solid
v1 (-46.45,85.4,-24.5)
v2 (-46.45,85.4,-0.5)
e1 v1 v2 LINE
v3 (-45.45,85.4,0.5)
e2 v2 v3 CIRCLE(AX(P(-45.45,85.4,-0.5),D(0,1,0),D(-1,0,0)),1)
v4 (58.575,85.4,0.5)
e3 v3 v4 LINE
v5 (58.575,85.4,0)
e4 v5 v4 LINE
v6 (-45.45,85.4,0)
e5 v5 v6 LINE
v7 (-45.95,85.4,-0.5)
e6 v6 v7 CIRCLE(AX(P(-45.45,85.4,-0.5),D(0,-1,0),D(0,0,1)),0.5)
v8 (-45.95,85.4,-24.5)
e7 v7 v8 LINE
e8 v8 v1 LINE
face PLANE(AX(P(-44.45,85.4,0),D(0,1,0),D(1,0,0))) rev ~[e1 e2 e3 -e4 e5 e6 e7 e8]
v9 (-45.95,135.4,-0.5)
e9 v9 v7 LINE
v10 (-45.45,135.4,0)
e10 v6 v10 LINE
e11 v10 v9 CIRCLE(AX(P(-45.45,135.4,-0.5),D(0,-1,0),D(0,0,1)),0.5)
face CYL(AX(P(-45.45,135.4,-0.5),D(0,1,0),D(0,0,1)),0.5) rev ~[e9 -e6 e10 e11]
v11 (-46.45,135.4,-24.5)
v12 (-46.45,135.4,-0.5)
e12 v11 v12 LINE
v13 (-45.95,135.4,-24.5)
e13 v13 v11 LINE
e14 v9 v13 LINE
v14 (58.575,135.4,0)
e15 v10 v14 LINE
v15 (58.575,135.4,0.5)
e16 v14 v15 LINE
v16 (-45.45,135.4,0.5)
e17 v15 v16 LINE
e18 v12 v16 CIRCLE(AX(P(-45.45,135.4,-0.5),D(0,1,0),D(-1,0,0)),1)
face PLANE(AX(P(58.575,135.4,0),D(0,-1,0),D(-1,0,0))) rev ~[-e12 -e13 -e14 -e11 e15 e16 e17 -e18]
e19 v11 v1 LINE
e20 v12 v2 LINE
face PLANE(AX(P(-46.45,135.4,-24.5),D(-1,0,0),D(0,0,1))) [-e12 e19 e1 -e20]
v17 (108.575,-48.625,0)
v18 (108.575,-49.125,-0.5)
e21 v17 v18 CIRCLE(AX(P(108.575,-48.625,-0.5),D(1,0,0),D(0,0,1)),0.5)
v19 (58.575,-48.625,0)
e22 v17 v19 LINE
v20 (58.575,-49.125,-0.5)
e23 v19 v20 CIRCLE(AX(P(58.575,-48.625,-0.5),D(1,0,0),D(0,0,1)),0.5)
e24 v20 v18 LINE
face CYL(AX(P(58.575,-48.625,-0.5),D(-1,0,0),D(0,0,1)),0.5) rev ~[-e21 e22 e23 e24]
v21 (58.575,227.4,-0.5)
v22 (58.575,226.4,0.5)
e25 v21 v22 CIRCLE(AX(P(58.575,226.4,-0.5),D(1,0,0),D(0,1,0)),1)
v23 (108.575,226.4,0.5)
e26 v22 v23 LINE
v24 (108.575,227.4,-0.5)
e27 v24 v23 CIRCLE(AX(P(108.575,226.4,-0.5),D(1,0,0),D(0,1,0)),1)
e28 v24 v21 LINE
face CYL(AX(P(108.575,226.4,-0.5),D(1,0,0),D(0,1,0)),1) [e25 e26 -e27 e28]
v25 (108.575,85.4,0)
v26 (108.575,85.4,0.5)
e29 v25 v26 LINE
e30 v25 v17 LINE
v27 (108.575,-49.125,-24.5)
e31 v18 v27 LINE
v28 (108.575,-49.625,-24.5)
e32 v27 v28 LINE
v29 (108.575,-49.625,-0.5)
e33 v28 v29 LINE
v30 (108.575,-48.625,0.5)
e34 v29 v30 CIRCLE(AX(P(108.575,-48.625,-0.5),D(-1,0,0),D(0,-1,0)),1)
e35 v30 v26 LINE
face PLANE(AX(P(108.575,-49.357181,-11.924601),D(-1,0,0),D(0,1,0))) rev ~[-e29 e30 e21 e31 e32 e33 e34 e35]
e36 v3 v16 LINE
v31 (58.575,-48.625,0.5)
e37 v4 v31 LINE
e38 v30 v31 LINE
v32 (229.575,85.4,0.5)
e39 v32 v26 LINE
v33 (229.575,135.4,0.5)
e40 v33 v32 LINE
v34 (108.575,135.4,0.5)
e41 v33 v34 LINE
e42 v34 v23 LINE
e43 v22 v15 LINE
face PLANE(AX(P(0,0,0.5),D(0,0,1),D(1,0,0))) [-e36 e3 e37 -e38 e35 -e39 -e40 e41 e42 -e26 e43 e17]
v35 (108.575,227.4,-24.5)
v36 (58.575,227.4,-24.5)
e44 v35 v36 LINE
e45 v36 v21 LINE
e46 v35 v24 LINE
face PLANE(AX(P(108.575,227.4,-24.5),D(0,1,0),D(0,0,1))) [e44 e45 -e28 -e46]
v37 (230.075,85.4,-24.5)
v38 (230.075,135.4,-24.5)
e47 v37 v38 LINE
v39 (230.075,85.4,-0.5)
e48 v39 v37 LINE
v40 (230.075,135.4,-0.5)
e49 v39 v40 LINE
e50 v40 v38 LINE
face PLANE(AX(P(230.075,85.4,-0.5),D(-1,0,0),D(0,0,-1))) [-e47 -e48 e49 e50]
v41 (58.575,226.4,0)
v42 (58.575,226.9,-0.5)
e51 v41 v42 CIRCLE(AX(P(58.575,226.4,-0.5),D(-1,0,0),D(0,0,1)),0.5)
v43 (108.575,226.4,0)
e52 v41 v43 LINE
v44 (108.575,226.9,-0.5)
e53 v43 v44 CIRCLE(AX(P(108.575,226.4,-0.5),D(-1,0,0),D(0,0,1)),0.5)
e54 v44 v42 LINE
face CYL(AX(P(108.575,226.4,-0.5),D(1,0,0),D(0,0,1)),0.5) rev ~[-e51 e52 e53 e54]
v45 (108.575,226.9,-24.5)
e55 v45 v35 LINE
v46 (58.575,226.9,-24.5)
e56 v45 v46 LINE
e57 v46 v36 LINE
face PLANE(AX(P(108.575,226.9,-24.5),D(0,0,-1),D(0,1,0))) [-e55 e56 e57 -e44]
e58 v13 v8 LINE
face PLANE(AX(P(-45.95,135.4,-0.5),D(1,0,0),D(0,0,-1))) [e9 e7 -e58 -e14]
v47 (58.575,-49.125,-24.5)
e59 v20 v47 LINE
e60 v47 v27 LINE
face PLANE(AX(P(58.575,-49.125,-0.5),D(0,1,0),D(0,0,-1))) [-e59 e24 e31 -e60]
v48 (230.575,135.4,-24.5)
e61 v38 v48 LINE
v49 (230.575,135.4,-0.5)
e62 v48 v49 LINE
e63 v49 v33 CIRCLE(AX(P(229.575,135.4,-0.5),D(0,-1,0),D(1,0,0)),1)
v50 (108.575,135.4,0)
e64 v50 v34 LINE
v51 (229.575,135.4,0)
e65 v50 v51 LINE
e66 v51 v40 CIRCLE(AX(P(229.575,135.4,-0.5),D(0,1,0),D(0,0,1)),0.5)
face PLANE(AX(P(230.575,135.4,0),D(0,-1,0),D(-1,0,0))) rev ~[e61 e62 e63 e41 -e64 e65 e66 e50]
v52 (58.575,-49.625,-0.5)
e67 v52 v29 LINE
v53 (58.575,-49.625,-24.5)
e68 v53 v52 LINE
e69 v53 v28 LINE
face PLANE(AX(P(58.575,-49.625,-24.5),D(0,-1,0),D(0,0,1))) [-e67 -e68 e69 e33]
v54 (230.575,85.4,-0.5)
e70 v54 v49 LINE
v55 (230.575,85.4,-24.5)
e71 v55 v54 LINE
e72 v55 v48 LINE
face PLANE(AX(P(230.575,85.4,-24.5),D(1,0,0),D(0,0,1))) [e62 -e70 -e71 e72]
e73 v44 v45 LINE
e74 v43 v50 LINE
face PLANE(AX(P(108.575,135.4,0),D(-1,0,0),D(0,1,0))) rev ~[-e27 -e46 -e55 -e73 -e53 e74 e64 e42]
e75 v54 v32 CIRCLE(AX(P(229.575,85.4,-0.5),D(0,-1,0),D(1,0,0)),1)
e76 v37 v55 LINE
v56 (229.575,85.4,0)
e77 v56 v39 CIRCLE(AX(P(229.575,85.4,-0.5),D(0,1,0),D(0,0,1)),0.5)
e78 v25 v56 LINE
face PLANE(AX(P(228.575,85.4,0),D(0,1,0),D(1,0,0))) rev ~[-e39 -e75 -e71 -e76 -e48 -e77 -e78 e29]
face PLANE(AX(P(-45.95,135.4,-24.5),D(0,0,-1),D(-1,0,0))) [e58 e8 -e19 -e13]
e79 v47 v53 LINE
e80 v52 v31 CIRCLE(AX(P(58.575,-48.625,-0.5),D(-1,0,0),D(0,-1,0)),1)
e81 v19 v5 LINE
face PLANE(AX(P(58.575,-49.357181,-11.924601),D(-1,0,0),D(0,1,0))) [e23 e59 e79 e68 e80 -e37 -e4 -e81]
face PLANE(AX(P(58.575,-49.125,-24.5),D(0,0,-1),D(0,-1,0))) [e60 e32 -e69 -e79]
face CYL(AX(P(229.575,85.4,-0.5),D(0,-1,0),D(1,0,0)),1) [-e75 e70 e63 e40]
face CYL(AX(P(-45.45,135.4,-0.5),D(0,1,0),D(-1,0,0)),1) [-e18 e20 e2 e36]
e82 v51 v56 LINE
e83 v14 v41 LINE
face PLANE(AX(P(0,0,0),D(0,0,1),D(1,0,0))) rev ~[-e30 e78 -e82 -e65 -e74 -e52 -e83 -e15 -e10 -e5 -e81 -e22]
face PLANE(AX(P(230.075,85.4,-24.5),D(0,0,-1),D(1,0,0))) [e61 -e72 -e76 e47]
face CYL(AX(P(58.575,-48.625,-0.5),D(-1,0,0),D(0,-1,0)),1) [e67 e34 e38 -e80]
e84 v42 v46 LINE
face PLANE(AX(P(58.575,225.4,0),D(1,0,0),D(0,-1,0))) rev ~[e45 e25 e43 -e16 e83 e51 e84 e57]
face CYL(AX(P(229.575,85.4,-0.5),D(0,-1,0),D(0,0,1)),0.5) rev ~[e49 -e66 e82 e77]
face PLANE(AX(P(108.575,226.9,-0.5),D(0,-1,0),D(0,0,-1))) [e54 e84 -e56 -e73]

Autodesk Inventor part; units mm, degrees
ref_plane "YZ Plane" through (0, 0, 0) normal (1, 0, 0) x (0, 1, 0)
ref_plane "XZ Plane" through (0, 0, 0) normal (0, 1, 0) x (-1, 0, 0)
ref_plane "XY Plane" through (0, 0, 0) normal (0, 0, 1) x (1, 0, 0)
ref_plane "Work Plane1" through (0, 0, 0) normal (0, 0, 1) x (1, 0, 0)
sketch "Sketch1" plane through (0, 0, 0) normal (0, 0, 1) x (1, 0, 0)
  line L0 (230.575, 85.4) -> (230.575, 135.4)
  line L1 (-46.45, 135.4) -> (-46.45, 85.4)
  line L2 (58.575, -49.625) -> (108.575, -49.625)
  line L3 (108.575, 227.4) -> (58.575, 227.4)
  line L4 (-622.225, -47.625) -> (228.575, -47.625)
  line L5 (-44.45, 0) -> (-44.45, 225.4)
  line L6 (180.95, 225.4) -> (-44.45, 225.4)
  line L7 (228.575, -47.625) -> (228.575, 1203.175)
  line L8 (-46.45, 85.4) -> (58.575, 85.4)
  line L9 (108.575, 85.4) -> (230.575, 85.4)
  line L10 (108.575, -49.625) -> (108.575, 85.4)
  line L11 (108.575, 135.4) -> (108.575, 227.4)
  line L12 (58.575, 227.4) -> (58.575, 135.4)
  line L13 (58.575, 85.4) -> (58.575, -49.625)
  line L14 (230.575, 135.4) -> (108.575, 135.4)
  line L15 (58.575, 135.4) -> (-46.45, 135.4)
  point P0 (0, 0)
  point P1 (83.575, 227.4)
  point P2 (83.575, -49.625)
  dimension "d16" = 2
  dimension "d17" = 2
  dimension "d18" = 2
  dimension "d19" = 2
  dimension "d20" = 92
  dimension "d21" = 122
  dimension "d22" = 105.025
  dimension "d23" = 135.025
  dimension "d24" = 50
  dimension "d25" = 50
  dimension "d26" = 50
extrude "Plate1" add sketch "Sketch1" along normal blind 0.5 contours L9 L7 L14 L0 | L9 L10 L4 L13 L8 L5 L15 L12 L6 L11 L14 L7 | L10 L2 L13 L4 | L6 L12 L3 L11 | L8 L1 L15 L5
sketch "Sketch3" plane through (108.575, -49.125, 0.5) normal (0, -1, 0) x (1, 0, 0)
  line L0 (-50, 0) -> (0, 0)
  line L1 (0, 0) -> (0, 25)
  line L2 (0, 25) -> (-50, 25)
  line L3 (-50, 25) -> (-50, 0)
edge flange "Flange2" height 25 angle 90 thickness 0.5 bend radius 0.5 thickness toward (0, -1, 0) relief tear relief width 0.5 relief depth 0.25 corner gap 0.5 corner form 0 edges at (83.575, -49.625, 0.5) (230.575, 110.4, 0.5) (83.575, 227.4, 0.5) (-46.45, 110.4, 0.5) wall of the first edge with corners at (58.575, -49.125, 0.5) (108.575, -49.125, 0.5) (108.575, -49.125, -24.5) (58.575, -49.125, -24.5)
bend "Bend2"
corner "Corner2"
equation "\"d4\" = Thickness"
equation "\"d27\" = BendReliefWidth"
equation "\"d28\" = BendReliefDepth"
equation "\"d29\" = MinimumRemnant"
equation "\"d30\" = TransitionRadius"
equation "\"d33\" = BendRadius"
equation "\"d34\" = CornerReliefSize"
equation "\"d35\" = GapSize"
equation "\"d36\" = JacobiRadiusSize"
equation "\"BendRadius\" = Thickness"
equation "\"BendReliefWidth\" = Thickness"
equation "\"BendReliefDepth\" = 0.5 * Thickness"
equation "\"CornerReliefSize\" = 4 * Thickness"
equation "\"MinimumRemnant\" = 2 * Thickness"
equation "\"TransitionRadius\" = BendRadius"
equation "\"JacobiRadiusSize\" = BendRadius"
equation "\"GapSize\" = Thickness"
equation "\"Thickness\" = 0.5"
properties part number "Brush_holder"
